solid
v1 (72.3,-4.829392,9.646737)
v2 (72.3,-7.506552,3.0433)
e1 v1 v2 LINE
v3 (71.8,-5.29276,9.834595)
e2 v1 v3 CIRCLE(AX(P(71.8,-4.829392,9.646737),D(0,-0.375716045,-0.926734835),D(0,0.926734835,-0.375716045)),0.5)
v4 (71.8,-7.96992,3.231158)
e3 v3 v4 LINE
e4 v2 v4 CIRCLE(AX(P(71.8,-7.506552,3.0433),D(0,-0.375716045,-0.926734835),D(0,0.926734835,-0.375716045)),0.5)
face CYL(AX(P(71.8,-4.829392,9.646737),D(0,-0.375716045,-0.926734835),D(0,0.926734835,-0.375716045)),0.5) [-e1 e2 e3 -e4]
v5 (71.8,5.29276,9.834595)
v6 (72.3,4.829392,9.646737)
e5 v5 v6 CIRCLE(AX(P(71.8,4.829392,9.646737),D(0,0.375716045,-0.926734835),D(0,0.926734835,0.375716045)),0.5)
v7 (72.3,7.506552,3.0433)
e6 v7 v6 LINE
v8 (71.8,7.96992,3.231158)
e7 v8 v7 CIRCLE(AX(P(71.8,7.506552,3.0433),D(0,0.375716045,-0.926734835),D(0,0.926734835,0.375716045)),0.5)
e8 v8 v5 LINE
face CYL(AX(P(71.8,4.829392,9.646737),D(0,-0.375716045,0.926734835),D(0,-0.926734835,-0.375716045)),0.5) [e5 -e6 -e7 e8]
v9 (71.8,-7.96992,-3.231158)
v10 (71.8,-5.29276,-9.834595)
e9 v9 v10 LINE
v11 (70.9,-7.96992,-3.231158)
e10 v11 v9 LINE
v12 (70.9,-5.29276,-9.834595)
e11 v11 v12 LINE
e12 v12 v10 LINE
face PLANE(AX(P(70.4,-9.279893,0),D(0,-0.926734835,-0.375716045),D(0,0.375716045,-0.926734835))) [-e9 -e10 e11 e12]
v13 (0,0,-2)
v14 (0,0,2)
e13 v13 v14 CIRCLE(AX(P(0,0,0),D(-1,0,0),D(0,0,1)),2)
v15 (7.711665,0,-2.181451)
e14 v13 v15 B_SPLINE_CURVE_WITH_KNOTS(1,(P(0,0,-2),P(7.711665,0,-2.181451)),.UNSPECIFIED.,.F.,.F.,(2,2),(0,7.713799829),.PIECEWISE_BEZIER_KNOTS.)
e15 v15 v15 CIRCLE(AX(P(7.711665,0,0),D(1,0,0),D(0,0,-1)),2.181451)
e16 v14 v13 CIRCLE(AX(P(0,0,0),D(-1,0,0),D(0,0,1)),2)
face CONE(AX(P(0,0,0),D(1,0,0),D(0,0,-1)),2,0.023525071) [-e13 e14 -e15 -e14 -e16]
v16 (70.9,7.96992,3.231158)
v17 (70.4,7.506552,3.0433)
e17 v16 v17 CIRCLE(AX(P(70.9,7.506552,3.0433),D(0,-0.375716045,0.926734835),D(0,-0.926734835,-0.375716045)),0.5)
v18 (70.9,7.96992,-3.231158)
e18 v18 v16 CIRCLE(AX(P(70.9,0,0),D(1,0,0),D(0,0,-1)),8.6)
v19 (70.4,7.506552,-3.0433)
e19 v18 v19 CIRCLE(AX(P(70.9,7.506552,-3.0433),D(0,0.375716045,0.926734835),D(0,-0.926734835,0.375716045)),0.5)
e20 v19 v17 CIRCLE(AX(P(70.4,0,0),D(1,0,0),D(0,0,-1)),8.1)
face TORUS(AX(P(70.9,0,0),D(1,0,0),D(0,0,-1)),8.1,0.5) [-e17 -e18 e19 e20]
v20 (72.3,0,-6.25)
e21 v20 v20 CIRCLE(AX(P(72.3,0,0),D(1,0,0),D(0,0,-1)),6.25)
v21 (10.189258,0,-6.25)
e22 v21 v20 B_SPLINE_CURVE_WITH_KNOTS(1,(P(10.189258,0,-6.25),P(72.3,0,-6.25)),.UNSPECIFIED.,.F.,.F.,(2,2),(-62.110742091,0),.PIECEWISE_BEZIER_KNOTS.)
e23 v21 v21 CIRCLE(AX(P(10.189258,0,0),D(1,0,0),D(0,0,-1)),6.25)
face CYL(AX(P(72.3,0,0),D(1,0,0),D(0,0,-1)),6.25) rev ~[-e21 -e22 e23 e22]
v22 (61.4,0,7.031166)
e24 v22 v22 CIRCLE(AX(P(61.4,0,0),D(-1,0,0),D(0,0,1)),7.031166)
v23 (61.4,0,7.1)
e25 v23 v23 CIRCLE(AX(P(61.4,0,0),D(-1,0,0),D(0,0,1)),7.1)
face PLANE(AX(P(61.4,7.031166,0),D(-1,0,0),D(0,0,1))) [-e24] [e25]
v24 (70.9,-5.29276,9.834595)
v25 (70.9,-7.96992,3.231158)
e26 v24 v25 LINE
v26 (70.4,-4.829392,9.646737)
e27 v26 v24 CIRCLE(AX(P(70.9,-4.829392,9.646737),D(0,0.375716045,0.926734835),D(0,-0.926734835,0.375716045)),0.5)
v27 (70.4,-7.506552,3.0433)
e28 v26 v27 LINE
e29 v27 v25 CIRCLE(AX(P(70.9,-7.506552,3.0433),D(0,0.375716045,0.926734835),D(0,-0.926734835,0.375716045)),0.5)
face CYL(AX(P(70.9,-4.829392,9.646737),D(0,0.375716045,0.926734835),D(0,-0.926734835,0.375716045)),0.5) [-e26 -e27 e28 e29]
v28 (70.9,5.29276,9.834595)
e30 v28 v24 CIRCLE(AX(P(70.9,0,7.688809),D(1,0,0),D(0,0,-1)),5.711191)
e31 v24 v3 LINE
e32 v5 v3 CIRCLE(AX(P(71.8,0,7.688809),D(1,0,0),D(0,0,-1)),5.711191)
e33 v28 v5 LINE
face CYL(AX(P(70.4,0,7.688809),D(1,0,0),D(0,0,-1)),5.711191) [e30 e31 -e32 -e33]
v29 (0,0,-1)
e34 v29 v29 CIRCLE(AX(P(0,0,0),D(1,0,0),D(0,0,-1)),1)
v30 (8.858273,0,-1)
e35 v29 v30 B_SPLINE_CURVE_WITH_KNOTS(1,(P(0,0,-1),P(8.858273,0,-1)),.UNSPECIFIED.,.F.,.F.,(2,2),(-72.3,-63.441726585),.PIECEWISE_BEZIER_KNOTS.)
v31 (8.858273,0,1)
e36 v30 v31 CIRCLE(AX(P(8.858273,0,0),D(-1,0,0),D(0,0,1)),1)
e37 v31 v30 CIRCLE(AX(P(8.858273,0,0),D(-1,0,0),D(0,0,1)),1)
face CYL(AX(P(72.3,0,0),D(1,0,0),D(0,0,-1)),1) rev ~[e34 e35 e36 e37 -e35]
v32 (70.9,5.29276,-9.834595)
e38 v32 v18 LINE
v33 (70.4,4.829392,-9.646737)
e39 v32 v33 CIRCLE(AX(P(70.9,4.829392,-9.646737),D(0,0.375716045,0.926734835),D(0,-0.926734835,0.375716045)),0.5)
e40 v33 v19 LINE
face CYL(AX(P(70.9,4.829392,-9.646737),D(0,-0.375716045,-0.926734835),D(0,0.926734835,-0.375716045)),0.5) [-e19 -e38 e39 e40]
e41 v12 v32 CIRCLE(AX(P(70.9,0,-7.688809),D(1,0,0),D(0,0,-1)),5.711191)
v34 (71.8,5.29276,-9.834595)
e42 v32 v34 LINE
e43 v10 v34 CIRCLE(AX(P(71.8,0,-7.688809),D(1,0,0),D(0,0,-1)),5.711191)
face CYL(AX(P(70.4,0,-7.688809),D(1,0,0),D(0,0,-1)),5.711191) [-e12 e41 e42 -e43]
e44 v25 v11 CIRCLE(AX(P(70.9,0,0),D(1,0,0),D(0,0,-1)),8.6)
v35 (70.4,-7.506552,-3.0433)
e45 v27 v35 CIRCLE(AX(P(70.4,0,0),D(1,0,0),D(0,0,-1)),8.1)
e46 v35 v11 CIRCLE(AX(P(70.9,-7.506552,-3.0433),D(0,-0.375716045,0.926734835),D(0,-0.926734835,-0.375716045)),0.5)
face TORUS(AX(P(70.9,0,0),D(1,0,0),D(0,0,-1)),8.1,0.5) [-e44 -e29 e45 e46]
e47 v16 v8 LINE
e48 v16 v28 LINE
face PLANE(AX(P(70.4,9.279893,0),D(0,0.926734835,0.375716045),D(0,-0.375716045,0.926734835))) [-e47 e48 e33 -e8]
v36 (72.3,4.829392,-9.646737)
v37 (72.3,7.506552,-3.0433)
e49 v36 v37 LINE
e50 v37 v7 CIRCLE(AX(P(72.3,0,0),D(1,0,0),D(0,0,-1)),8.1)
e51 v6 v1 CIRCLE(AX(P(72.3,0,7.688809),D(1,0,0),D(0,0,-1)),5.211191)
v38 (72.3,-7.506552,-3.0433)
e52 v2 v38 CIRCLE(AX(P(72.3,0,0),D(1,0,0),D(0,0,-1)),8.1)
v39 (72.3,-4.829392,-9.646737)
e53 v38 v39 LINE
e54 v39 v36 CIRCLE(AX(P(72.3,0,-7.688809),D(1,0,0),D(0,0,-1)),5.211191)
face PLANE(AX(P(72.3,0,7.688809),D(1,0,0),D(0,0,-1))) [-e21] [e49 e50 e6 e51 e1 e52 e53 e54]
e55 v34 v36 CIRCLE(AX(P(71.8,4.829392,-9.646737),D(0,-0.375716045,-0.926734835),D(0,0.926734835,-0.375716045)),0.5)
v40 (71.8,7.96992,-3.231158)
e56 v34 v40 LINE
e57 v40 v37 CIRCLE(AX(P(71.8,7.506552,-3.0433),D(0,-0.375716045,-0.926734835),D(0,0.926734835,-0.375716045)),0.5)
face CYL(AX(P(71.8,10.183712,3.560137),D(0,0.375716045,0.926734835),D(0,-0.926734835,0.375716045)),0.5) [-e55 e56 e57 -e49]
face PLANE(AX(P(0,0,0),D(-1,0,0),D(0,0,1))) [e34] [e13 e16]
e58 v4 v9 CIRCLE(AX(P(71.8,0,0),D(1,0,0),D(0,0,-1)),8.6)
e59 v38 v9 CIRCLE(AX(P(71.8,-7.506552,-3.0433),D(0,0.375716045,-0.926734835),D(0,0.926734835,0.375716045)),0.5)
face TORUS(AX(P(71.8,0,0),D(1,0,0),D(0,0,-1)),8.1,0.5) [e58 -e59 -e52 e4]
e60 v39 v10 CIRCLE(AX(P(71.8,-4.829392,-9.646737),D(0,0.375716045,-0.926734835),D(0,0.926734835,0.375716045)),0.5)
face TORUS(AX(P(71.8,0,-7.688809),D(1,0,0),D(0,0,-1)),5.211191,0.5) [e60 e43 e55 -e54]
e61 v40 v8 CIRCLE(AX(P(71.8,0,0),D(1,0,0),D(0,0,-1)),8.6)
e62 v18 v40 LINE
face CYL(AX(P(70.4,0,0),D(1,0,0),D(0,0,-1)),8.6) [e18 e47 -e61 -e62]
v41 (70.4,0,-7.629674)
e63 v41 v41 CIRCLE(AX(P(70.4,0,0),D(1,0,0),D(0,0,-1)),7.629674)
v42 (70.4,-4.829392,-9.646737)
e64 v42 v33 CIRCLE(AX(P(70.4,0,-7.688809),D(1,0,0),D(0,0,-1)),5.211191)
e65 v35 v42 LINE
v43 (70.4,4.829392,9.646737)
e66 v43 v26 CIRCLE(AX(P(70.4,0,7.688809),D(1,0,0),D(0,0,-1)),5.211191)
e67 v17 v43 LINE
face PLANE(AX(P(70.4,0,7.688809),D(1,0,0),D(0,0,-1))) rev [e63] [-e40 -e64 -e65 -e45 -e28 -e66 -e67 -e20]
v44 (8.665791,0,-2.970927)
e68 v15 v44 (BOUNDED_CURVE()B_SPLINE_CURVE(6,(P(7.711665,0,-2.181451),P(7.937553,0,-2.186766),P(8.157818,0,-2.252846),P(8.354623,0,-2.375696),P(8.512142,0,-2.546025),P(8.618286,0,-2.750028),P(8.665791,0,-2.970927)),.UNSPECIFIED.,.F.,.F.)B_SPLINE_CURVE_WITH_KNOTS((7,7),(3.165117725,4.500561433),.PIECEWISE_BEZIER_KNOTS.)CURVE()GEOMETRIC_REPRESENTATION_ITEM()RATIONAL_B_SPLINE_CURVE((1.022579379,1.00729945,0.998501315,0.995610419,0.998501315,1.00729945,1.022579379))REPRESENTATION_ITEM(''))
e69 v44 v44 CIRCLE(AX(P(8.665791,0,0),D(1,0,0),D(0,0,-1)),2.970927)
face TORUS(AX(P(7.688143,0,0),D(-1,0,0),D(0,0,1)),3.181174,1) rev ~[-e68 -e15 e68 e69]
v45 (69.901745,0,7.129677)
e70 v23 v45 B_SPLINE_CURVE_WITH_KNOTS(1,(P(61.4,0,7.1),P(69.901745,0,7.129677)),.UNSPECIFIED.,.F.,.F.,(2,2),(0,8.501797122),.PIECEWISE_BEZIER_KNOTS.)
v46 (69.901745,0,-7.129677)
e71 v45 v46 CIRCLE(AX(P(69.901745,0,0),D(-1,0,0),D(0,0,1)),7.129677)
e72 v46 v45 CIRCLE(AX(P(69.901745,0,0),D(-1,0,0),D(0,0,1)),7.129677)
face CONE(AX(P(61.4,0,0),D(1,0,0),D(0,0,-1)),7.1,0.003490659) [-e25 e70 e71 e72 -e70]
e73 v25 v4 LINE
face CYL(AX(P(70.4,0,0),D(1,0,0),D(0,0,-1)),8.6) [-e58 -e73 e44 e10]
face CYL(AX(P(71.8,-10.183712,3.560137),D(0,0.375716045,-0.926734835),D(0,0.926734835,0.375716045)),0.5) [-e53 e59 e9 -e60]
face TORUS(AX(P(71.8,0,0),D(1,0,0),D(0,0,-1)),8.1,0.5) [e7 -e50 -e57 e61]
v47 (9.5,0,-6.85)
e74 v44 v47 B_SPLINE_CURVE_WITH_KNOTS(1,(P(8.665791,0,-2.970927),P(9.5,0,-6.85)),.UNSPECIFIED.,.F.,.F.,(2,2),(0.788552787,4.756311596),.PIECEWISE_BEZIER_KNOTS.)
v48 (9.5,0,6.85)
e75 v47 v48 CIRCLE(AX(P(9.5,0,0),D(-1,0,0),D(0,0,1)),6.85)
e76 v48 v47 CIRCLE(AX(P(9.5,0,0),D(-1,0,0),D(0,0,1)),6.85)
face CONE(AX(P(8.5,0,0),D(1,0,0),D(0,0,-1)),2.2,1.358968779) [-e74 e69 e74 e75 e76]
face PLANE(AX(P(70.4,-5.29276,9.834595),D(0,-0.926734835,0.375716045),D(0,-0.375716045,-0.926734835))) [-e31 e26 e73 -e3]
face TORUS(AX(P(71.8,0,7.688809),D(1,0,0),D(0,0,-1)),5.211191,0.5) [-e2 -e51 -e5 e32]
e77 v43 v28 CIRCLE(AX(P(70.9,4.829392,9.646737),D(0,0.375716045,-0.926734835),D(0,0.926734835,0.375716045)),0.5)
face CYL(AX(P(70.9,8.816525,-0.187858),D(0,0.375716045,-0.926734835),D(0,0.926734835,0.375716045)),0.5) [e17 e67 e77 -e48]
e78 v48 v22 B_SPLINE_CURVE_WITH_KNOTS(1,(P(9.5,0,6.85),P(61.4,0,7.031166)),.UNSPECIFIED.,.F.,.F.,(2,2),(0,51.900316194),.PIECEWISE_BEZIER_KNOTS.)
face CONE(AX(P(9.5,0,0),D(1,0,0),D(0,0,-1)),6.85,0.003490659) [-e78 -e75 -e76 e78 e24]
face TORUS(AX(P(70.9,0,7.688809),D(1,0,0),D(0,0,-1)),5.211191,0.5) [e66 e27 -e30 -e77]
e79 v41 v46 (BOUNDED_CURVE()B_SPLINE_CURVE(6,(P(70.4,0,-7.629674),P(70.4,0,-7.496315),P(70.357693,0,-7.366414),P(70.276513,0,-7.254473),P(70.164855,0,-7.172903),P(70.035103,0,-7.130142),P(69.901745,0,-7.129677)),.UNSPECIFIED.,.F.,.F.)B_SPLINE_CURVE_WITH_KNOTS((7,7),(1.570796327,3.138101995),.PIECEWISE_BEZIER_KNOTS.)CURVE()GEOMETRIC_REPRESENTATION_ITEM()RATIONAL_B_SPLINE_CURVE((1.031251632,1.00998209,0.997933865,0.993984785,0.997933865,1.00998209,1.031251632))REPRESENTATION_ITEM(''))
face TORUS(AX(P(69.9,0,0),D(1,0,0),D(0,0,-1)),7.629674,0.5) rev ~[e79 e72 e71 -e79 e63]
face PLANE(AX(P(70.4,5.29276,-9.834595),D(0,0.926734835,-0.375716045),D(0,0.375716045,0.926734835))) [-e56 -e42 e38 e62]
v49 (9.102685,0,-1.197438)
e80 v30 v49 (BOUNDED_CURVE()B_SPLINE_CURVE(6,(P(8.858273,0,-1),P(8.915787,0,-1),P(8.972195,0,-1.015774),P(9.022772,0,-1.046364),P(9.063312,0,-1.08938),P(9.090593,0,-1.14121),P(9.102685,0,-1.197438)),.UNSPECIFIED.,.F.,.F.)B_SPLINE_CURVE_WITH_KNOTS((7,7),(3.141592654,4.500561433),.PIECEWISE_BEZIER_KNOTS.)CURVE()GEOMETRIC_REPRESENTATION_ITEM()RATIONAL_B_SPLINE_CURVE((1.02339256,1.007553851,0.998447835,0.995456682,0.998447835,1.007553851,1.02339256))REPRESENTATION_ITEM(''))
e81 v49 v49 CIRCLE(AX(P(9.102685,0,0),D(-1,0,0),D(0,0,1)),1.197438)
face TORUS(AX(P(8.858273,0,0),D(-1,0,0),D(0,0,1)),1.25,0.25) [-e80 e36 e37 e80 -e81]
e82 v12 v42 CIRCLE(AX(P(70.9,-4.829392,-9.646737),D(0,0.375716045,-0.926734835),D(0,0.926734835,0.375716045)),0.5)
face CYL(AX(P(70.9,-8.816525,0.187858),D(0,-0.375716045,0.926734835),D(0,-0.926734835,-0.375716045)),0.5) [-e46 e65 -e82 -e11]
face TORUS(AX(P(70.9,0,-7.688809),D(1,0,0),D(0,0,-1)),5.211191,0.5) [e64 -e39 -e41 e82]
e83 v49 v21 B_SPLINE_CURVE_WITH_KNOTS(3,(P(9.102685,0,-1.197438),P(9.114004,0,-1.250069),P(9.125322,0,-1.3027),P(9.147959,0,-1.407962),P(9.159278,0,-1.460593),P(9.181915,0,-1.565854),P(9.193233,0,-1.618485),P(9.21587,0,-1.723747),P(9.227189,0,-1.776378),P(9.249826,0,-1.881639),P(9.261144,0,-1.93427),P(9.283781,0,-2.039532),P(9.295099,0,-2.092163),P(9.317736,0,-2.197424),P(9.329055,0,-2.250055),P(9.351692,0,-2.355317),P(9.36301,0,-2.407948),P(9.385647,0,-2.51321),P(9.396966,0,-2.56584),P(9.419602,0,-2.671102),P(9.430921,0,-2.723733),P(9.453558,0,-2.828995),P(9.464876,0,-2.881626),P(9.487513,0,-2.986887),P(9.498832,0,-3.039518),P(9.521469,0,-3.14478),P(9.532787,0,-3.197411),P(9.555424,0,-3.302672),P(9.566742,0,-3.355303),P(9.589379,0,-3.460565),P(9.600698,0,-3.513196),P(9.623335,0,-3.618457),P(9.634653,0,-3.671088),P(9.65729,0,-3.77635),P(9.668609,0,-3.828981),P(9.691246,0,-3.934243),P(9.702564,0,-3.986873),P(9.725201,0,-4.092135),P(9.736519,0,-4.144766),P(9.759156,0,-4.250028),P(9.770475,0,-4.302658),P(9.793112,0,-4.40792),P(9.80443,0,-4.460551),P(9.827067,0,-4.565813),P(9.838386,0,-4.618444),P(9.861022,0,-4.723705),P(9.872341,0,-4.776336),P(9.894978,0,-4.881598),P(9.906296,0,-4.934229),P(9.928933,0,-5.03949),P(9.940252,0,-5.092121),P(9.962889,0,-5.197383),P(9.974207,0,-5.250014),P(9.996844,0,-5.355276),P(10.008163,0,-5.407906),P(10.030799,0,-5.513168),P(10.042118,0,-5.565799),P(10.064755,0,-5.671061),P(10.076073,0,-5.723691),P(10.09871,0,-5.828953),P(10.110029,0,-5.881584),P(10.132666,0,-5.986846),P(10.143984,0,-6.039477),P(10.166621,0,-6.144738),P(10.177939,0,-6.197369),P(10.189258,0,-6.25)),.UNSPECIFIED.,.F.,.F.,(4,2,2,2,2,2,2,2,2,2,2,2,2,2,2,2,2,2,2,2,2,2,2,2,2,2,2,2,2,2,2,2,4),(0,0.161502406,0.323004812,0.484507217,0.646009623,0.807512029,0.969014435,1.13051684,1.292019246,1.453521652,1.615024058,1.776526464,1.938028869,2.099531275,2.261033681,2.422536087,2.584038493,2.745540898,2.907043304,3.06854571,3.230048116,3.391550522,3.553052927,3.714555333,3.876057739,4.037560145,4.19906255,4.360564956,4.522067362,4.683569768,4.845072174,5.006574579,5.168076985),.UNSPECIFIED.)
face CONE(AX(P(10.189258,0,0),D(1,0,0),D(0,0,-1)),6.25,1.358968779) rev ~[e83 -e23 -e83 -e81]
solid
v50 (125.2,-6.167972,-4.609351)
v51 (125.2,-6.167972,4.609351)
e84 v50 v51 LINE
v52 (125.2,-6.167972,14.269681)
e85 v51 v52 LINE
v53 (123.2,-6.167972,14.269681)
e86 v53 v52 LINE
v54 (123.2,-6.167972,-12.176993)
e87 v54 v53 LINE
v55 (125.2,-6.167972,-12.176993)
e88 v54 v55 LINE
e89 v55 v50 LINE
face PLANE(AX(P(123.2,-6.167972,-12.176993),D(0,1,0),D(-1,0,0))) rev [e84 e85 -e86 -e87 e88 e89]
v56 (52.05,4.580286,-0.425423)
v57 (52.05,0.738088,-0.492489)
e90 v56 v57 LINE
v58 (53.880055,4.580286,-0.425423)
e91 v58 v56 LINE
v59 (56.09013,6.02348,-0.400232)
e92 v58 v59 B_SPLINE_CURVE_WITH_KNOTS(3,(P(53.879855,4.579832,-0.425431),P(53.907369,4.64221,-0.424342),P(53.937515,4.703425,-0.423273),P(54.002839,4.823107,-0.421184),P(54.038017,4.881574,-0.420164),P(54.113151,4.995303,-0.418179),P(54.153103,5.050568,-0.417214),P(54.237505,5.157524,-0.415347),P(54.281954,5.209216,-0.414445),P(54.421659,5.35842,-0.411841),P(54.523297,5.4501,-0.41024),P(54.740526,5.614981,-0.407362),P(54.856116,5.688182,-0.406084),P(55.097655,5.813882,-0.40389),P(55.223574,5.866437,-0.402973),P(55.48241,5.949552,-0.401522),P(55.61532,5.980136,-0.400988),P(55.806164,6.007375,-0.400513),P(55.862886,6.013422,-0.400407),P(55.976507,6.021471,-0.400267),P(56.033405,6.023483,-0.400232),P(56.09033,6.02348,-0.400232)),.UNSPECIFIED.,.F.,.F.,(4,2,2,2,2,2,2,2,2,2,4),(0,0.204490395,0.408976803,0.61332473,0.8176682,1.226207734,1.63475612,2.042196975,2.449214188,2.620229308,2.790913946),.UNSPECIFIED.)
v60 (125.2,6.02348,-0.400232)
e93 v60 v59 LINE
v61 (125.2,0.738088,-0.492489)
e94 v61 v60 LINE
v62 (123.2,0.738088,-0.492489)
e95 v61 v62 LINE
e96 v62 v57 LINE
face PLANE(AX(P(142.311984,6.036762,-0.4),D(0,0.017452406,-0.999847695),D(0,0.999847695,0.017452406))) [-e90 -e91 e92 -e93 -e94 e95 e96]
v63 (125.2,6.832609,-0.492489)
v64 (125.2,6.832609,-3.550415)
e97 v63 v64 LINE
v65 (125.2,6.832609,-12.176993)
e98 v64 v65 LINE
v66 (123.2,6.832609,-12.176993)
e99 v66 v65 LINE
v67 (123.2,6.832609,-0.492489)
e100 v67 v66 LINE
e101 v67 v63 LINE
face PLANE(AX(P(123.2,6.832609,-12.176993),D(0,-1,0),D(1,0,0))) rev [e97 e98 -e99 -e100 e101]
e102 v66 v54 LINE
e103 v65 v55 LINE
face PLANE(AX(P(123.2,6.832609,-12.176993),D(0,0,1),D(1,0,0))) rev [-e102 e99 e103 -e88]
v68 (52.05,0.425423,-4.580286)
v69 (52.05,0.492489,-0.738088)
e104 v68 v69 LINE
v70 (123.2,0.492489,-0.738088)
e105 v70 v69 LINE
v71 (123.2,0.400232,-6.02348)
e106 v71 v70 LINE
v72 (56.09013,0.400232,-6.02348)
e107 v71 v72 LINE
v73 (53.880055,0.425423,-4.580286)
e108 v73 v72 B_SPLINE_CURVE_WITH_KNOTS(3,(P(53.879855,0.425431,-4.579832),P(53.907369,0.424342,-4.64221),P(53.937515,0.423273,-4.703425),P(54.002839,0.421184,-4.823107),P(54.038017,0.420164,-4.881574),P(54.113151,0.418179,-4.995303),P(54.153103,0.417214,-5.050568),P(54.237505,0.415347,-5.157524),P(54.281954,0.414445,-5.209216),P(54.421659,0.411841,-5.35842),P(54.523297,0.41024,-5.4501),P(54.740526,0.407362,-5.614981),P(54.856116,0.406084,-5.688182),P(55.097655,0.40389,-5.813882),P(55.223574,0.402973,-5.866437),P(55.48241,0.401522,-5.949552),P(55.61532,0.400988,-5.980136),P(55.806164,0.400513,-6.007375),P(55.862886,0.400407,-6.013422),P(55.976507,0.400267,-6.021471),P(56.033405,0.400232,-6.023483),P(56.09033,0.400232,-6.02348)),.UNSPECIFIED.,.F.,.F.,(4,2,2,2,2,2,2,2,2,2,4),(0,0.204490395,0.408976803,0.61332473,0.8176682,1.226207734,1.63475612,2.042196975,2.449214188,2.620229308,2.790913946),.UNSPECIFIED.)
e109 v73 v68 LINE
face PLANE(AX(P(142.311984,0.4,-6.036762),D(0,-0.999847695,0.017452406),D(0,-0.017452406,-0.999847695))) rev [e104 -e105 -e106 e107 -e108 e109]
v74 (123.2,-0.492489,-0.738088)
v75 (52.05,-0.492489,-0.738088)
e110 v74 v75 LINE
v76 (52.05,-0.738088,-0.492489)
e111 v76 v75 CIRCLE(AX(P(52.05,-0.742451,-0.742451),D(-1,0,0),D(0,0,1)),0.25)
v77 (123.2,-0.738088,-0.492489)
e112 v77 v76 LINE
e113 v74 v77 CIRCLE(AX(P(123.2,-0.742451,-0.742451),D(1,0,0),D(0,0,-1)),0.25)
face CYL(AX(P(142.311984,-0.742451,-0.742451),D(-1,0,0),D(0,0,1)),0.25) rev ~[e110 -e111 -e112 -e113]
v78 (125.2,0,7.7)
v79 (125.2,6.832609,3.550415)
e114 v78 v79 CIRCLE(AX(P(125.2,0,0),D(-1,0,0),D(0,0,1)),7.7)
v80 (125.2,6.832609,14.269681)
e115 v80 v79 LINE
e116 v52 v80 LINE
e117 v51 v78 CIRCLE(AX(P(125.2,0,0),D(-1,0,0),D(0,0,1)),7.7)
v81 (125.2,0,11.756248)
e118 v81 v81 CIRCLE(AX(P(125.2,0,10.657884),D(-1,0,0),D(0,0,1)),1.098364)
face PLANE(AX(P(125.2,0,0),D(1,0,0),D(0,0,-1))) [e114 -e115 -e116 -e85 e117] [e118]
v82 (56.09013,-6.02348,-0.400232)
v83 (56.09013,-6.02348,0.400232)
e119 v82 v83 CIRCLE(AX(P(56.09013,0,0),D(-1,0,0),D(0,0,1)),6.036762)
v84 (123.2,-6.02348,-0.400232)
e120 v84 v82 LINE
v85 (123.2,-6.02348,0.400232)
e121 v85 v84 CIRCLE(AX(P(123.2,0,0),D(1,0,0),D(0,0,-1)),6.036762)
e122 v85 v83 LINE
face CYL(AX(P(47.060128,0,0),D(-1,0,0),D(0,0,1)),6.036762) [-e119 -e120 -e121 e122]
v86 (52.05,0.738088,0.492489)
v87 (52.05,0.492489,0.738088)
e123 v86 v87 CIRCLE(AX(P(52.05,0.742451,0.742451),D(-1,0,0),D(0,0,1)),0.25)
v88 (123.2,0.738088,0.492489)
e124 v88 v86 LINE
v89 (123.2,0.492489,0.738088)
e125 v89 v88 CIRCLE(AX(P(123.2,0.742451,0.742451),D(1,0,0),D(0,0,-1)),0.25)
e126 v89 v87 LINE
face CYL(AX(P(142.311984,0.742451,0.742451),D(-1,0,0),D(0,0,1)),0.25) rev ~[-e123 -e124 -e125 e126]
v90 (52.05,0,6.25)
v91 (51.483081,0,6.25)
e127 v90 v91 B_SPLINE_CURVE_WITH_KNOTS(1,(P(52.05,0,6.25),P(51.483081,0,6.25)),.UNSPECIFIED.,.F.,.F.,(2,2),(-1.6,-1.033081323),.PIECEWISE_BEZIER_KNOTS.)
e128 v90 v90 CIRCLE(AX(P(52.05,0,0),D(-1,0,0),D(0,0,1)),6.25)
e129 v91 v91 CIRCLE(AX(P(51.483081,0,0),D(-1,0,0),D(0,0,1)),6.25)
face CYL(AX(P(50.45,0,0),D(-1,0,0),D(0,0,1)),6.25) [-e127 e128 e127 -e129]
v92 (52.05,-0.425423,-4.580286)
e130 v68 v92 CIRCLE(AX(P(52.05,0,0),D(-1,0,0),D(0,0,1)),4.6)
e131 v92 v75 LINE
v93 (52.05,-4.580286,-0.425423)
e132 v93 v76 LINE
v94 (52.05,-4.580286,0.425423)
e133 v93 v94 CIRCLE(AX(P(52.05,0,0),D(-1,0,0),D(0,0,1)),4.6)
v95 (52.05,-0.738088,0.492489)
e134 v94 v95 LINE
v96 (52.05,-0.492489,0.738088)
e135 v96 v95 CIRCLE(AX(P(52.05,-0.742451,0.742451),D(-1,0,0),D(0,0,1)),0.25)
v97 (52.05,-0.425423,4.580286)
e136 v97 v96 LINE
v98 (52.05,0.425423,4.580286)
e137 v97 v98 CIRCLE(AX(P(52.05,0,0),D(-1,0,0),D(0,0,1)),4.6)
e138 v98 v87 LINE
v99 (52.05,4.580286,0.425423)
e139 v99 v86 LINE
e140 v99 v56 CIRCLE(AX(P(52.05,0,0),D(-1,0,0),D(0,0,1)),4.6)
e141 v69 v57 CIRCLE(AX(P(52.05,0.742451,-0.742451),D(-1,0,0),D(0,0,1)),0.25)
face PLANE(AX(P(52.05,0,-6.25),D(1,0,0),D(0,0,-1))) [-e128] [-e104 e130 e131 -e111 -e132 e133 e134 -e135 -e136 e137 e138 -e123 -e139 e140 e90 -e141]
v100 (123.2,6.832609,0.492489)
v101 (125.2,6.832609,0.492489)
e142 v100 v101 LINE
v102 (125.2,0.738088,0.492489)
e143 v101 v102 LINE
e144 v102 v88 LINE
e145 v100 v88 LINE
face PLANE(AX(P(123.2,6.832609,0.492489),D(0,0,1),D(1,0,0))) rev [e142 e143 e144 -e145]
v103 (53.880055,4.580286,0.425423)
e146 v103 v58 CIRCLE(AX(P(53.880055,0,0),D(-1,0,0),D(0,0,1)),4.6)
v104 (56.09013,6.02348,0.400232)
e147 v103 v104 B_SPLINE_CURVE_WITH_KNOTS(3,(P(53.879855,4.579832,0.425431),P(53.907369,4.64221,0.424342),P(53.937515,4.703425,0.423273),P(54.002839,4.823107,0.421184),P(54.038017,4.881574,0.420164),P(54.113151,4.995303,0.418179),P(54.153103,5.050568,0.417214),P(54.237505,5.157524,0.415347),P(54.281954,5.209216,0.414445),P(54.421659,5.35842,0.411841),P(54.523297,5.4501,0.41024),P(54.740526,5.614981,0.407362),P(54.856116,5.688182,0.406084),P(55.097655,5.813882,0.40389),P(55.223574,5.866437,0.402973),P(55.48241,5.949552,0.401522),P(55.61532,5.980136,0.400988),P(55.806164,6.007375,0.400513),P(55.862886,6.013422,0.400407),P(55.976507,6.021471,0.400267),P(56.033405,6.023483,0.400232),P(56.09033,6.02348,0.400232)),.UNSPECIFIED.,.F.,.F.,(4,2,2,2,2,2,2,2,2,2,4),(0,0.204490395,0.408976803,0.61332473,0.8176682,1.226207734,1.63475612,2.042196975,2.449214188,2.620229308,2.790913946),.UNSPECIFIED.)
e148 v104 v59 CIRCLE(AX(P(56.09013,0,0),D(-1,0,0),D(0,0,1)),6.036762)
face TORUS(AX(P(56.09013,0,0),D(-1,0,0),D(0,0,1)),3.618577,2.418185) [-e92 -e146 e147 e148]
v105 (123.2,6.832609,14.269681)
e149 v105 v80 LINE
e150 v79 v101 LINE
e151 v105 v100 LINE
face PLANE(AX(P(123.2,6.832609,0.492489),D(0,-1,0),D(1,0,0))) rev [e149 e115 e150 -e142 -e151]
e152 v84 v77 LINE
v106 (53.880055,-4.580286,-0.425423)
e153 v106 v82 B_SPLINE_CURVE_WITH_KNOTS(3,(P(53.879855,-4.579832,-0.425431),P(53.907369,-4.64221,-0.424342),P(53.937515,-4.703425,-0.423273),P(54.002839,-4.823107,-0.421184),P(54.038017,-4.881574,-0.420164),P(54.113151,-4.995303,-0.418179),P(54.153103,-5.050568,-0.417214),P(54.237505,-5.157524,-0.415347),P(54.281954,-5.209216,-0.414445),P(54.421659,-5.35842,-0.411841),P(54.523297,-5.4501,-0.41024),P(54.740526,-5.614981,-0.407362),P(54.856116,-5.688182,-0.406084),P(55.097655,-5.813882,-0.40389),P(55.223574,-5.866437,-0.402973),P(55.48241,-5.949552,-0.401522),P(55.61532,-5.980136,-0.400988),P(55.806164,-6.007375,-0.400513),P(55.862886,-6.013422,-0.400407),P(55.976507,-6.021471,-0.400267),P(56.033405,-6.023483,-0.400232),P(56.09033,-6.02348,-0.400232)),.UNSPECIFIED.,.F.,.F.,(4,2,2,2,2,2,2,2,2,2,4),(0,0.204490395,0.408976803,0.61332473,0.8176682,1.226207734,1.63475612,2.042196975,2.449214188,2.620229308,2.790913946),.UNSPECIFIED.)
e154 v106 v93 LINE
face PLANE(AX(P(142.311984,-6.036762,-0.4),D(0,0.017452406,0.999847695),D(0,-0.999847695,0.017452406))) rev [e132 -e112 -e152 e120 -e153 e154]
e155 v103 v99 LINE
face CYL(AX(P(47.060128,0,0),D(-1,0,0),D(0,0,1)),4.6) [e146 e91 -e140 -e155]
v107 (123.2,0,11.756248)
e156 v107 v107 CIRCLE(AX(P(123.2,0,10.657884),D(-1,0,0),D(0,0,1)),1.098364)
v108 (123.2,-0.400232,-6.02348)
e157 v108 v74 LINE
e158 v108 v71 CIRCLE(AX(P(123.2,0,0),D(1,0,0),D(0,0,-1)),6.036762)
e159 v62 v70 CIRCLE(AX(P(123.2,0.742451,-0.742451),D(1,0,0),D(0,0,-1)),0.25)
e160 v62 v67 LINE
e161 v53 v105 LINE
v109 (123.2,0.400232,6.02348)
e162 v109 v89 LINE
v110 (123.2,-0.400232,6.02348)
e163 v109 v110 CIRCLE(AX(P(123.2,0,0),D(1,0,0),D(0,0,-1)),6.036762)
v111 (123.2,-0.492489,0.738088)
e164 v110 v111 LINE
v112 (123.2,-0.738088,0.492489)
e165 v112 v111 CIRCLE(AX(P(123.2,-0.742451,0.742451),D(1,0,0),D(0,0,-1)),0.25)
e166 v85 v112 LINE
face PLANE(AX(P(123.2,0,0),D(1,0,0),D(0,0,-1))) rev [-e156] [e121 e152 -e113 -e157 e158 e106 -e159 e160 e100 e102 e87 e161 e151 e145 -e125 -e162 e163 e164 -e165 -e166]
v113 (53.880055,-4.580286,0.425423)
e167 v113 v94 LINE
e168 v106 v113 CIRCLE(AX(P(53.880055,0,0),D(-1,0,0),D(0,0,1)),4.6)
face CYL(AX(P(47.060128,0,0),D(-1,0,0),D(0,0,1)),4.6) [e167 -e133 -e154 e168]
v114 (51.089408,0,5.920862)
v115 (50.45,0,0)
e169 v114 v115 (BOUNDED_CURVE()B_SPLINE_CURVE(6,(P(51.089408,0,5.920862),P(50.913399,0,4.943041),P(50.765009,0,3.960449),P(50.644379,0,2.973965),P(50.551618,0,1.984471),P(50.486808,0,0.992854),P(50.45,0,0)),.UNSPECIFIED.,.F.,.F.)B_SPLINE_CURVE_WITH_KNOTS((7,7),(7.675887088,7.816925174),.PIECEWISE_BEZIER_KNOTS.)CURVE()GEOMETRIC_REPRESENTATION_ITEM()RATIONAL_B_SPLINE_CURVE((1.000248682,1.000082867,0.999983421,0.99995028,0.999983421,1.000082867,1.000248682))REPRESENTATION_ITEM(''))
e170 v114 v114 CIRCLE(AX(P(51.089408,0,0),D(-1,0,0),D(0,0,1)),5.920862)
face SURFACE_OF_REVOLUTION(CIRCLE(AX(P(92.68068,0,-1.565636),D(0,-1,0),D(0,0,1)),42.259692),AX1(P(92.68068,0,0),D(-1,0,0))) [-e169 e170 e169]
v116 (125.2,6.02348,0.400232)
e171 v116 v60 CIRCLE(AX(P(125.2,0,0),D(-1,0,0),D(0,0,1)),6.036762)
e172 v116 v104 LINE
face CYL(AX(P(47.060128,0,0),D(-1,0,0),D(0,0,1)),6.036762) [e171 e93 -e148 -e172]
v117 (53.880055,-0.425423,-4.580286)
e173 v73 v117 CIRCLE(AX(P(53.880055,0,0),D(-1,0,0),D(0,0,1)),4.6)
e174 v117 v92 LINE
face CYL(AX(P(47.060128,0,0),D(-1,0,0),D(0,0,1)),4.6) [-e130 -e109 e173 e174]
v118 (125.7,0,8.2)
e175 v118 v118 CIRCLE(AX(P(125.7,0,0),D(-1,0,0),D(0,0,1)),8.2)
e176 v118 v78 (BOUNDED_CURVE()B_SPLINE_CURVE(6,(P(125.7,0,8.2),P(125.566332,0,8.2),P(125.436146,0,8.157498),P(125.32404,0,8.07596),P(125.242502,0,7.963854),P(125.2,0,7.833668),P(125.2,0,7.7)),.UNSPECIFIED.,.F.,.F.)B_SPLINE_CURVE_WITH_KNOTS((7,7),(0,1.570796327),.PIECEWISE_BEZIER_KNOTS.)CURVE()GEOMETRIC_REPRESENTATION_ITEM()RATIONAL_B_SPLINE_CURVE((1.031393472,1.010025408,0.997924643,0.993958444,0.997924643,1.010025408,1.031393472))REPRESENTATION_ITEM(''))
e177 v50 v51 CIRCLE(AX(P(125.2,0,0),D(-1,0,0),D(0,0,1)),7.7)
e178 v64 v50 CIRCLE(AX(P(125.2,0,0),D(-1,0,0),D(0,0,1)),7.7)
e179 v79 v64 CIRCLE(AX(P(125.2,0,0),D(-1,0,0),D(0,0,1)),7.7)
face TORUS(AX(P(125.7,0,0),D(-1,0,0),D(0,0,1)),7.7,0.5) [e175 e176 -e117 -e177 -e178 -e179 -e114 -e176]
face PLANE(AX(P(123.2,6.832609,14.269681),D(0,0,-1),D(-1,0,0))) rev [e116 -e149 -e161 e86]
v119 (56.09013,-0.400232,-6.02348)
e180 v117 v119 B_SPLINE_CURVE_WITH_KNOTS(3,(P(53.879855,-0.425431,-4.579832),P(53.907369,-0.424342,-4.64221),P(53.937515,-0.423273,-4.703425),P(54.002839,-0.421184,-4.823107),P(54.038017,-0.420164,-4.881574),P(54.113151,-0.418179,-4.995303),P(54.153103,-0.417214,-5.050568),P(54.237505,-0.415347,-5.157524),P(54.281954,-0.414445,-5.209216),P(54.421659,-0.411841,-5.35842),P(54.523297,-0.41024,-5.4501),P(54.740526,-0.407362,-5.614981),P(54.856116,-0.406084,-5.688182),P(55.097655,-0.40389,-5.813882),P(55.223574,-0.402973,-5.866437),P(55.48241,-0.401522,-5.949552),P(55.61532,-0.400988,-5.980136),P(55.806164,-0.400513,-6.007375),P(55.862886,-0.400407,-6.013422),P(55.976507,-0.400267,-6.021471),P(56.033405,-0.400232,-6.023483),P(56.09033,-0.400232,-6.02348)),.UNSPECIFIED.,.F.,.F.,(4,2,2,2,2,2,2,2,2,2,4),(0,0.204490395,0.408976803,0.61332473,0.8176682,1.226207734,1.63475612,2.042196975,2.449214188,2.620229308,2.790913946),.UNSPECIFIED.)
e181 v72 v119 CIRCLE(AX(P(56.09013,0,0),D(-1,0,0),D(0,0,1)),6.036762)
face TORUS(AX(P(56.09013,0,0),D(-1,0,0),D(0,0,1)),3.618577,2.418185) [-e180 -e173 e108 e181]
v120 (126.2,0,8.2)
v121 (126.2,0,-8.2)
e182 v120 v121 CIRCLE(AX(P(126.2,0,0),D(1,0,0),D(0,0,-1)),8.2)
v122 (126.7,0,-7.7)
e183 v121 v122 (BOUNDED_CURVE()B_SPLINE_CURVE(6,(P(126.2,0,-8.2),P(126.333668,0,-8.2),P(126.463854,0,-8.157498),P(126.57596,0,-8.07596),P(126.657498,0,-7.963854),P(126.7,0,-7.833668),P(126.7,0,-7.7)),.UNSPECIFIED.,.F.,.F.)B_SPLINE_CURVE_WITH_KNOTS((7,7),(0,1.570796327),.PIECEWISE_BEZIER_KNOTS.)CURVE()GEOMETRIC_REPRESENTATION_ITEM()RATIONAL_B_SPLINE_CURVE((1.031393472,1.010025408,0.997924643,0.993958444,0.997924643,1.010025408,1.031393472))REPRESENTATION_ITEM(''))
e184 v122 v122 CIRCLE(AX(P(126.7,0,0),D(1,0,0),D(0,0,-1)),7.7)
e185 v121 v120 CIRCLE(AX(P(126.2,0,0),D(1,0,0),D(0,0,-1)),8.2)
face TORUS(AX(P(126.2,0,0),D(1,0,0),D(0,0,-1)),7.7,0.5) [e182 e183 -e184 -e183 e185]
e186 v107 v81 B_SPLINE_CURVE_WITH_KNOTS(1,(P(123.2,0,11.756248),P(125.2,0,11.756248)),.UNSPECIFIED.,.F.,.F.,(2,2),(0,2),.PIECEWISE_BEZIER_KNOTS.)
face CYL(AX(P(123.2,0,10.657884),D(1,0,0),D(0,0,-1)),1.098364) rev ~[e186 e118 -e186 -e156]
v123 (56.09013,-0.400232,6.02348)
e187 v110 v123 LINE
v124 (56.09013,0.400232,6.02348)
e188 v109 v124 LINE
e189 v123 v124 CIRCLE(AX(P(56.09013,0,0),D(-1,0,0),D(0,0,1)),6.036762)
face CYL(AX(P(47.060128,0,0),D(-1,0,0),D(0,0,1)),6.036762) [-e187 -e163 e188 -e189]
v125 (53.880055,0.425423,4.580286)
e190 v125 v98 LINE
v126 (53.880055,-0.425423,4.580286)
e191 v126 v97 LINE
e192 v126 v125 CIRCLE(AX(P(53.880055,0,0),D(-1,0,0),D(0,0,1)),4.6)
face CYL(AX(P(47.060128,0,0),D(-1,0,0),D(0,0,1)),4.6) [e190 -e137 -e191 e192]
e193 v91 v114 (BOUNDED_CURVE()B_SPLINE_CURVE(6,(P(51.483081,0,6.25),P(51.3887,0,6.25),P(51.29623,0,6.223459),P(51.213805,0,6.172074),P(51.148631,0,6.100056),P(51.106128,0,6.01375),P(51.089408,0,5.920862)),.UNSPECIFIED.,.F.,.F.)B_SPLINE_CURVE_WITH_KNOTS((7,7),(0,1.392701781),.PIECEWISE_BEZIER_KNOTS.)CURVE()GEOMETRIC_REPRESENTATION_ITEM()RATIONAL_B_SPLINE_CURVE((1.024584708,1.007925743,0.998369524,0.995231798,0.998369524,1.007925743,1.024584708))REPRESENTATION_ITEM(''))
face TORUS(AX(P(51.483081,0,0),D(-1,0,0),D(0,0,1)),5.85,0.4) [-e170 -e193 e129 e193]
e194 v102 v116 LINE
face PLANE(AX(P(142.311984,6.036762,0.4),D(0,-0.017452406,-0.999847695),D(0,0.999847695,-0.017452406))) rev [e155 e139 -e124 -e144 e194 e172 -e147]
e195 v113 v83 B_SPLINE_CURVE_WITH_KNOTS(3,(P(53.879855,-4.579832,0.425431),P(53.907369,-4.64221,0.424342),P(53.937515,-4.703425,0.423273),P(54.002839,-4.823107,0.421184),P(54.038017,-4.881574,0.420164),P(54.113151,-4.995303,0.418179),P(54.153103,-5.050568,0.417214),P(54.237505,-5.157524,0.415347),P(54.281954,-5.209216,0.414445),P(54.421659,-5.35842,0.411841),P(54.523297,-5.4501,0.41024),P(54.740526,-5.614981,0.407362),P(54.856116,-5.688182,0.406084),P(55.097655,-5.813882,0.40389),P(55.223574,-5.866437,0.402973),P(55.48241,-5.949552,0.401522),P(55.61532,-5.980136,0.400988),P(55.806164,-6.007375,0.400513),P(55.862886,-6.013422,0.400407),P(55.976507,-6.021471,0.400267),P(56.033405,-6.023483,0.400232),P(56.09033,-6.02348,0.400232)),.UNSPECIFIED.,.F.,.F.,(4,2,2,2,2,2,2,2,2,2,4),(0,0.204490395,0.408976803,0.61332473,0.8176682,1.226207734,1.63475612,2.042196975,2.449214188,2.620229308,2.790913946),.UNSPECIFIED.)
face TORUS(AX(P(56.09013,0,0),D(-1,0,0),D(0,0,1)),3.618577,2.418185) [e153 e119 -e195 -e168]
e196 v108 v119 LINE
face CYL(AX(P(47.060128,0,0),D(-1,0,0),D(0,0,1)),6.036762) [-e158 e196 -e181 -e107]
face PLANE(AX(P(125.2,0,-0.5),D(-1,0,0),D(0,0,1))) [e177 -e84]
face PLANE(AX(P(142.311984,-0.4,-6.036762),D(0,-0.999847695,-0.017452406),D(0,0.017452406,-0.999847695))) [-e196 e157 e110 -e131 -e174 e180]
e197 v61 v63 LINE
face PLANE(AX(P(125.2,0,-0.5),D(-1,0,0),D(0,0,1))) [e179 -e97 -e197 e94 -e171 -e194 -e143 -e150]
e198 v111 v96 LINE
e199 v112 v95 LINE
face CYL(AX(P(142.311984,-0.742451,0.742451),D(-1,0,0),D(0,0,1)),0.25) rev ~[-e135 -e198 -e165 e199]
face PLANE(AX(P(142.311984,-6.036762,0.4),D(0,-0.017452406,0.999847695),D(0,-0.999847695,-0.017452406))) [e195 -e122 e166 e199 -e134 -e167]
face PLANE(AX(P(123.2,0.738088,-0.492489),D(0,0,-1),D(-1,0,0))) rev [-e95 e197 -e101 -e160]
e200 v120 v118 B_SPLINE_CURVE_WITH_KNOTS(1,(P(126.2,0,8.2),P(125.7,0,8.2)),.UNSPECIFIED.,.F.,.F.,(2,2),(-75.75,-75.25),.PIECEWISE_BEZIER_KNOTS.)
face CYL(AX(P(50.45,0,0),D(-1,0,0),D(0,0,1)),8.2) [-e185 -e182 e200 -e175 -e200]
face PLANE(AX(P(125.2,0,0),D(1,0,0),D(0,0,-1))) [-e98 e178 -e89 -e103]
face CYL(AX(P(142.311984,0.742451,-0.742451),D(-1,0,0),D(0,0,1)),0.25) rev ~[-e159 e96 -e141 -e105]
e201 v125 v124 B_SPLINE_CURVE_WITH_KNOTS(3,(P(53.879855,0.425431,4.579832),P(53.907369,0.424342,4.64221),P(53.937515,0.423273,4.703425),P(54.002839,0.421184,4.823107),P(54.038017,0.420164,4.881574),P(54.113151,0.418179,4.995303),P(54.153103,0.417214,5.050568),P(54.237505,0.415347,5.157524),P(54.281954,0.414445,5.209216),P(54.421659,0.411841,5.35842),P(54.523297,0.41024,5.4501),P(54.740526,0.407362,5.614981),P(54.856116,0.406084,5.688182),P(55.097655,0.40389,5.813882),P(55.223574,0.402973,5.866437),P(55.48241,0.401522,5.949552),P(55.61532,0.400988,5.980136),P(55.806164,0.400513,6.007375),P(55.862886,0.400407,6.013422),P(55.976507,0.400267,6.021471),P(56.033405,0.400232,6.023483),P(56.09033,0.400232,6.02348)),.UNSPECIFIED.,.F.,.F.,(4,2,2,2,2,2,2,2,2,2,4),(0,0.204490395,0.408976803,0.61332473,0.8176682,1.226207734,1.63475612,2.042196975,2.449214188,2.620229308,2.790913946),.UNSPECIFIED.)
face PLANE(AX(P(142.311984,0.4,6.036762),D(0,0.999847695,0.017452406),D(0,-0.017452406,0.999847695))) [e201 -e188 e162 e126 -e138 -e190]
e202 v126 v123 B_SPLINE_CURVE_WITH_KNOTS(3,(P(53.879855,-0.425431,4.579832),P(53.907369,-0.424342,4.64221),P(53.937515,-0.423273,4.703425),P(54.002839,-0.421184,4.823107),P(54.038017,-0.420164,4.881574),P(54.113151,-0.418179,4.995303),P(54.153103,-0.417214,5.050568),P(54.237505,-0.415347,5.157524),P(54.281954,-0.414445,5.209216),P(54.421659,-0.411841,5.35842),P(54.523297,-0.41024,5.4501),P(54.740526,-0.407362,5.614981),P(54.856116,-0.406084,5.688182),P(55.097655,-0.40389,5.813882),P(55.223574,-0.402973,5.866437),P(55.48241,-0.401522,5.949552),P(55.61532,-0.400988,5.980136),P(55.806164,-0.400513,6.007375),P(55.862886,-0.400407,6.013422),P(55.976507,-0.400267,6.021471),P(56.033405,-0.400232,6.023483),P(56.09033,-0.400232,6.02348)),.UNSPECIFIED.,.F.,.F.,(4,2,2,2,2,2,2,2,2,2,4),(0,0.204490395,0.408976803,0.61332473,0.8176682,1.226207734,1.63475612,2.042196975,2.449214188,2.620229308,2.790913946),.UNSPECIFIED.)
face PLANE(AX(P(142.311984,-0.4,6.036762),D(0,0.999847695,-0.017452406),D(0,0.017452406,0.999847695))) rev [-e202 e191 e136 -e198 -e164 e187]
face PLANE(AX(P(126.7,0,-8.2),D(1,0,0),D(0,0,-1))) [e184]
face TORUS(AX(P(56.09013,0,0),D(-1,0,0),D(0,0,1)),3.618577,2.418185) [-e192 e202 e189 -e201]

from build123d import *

# Parameters (mm, degrees)
BOSS_EXTRUDE1_DEPTH       = 1.9
FILLET1_R                 = 8.6
FILLET2_R                 = 0.25
FILLET3_R                 = 0.5
FILLET4_R                 = 1
BOSS_EXTRUDE2_START       = 53.880055185
BOSS_EXTRUDE2_2_DEPTH     = 71.319944815
BOSS_EXTRUDE2_START_2     = 123.2
BOSS_EXTRUDE2_3_OUTLINE_R = 1.098363789
BOSS_EXTRUDE2_3_DEPTH     = 2
BOSS_EXTRUDE2_START_3     = 52.05
BOSS_EXTRUDE2_4_DEPTH     = 4.040129852


with BuildPart() as part:
    # Sketch1 → Boss-Extrude1 (new body)
    with BuildSketch(Plane(origin=(72.3, 0, 0), x_dir=(0, 0, -1), z_dir=(1, 0, 0))):
        with BuildLine():
            Line((-9.834595004, -5.292759782), (0, -9.279892888))
            Line((0, -9.279892888), (9.834595004, -5.292759782))
            ThreePointArc((9.834595004, -5.292759782), (13.4, 0), (9.834595004, 5.292759782))
            Line((9.834595004, 5.292759782), (0, 9.279892888))
            Line((0, 9.279892888), (-9.834595004, 5.292759782))
            ThreePointArc((-9.834595004, 5.292759782), (-13.4, 0), (-9.834595004, -5.292759782))
        make_face()
    extrude(amount=-BOSS_EXTRUDE1_DEPTH)

    # Sketch2 → Revolve1 (revolve)
    with BuildSketch(Plane(origin=(0, 0, 0), x_dir=(-1, 0, 0), z_dir=(0, 0, -1)), mode=Mode.PRIVATE) as revolve1_sk:
        Polygon((-70.4, 7.131416054), (-70.4, 0), (0, 0), (0, 2), (-8.5, 2.2), (-9.5, 6.85), (-61.4, 7.031165912), (-61.4, 7.1), align=None)
    revolve(revolve1_sk.sketch.rotate(Axis((70.4, 0, 0), (-1, 0, 0)), 90), axis=Axis((70.4, 0, 0), (-1, 0, 0)))

    # Sketch3 → Hole1 (revolve, cut)
    with BuildSketch(Plane(origin=(72.3, 0, 0), x_dir=(0, 0, -1), z_dir=(0, 1, 0))):
        Polygon((0, 0), (0, 72.3), (1, 72.3), (1, 63.239774349), (6.25, 62.110742091), (6.25, 0), align=None)
    revolve(axis=Axis((78.430023899, 0, 0), (-1, 0, 0)), mode=Mode.SUBTRACT)

    # Fillet1
    fillet1_edges = [part.edges().sort_by_distance(p)[0] for p in [
        (71.35, 9.279892888, 0),
        (71.35, -9.279892888, 0),
    ]]
    fillet(fillet1_edges, radius=FILLET1_R)

    # Fillet2
    fillet2_edges = [part.edges().sort_by_distance(p)[0] for p in [
        (9.060225651, 0, 1),
    ]]
    fillet(fillet2_edges, radius=FILLET2_R)

    # Fillet3
    fillet3_edges = [part.edges().sort_by_distance(p)[0] for p in [
        (70.4, 0, -13.4),
        (70.4, 0, 7.131416054),
        (70.4, 6.631339679, -6.532876496),
        (72.3, -6.631339679, -6.532876496),
        (72.3, 6.631339679, 6.532876496),
        (72.3, 8.6, 0),
        (72.3, -8.6, 0),
        (70.4, -6.631339679, -6.532876496),
        (70.4, 6.631339679, 6.532876496),
        (70.4, 8.6, 0),
        (70.4, -8.6, 0),
        (70.4, 0, 13.4),
        (72.3, 6.631339679, -6.532876496),
        (72.3, 0, -13.4),
        (72.3, -6.631339679, 6.532876496),
        (72.3, 0, 13.4),
        (70.4, -6.631339679, 6.532876496),
    ]]
    fillet(fillet3_edges, radius=FILLET3_R)

    # Fillet4
    fillet4_edges = [part.edges().sort_by_distance(p)[0] for p in [
        (8.5, 0, 2.2),
    ]]
    fillet(fillet4_edges, radius=FILLET4_R)


with BuildPart() as body_2:
    # Boss-Extrude2: read off the stored shape, not the designer's step
    # Boss-Extrude2 outline → Boss-Extrude2 (revolve)
    with BuildSketch(Plane.YX):
        with BuildLine():
            ThreePointArc((7.7, 125.2), (8.053553391, 125.346446609), (8.2, 125.7))
            Line((8.2, 125.7), (8.2, 126.2))
            ThreePointArc((8.2, 126.2), (8.053553391, 126.553553391), (7.7, 126.7))
            Line((7.7, 126.7), (0, 126.7))
            Line((0, 126.7), (0, 125.2))
            Line((0, 125.2), (7.7, 125.2))
        make_face()
        with BuildLine():
            ThreePointArc((5.920861832, 51.089408107), (6.156875164, 51.226512359), (6.25, 51.483081323))
            Line((6.25, 51.483081323), (6.25, 52.05))
            Line((6.25, 52.05), (0, 52.05))
            Line((0, 52.05), (0, 50.45))
            add(Edge.make_bspline(
                [(5.920861832, 51.089408107), (2.983013586, 50.560590548), (0, 50.45)],
                knots=[1.392701781, 1.392701781, 1.392701781, 1.533739867, 1.533739867, 1.533739867], degree=2, weights=[1, 0.997514563, 1]))
        make_face()
    revolve(axis=Axis((0, 0, 0), (1, 0, 0)))

    # Boss-Extrude2 2 outline → Boss-Extrude2 2 (add)
    with BuildSketch(Plane.YZ.offset(BOSS_EXTRUDE2_START)):
        with BuildLine():
            ThreePointArc((-0.738087536, -0.492488713), (-0.565673942, -0.565673942), (-0.492488713, -0.738087536))
            Line((-0.492488713, -0.738087536), (-0.40023184, -6.023480263))
            ThreePointArc((-0.40023184, -6.023480263), (0, -6.036762377), (0.40023184, -6.023480263))
            Line((0.40023184, -6.023480263), (0.492488713, -0.738087536))
            ThreePointArc((0.492488713, -0.738087536), (0.565673942, -0.565673942), (0.738087536, -0.492488713))
            Line((0.738087536, -0.492488713), (6.023480263, -0.40023184))
            ThreePointArc((6.023480263, -0.40023184), (6.036762377, 0), (6.023480263, 0.40023184))
            Line((6.023480263, 0.40023184), (0.738087536, 0.492488713))
            ThreePointArc((0.738087536, 0.492488713), (0.565673942, 0.565673942), (0.492488713, 0.738087536))
            Line((0.492488713, 0.738087536), (0.40023184, 6.023480263))
            ThreePointArc((0.40023184, 6.023480263), (0, 6.036762377), (-0.40023184, 6.023480263))
            Line((-0.40023184, 6.023480263), (-0.492488713, 0.738087536))
            ThreePointArc((-0.492488713, 0.738087536), (-0.565673942, 0.565673942), (-0.738087536, 0.492488713))
            Line((-0.738087536, 0.492488713), (-6.023480263, 0.40023184))
            ThreePointArc((-6.023480263, 0.40023184), (-6.036762377, 0), (-6.023480263, -0.40023184))
            Line((-6.023480263, -0.40023184), (-0.738087536, -0.492488713))
        make_face()
    extrude(amount=BOSS_EXTRUDE2_2_DEPTH)

    # Boss-Extrude2 3 outline → Boss-Extrude2 3 (add)
    with BuildSketch(Plane.YZ.offset(BOSS_EXTRUDE2_START_2)):
        with BuildLine():
            ThreePointArc((-0.492488713, -0.738087536), (-0.565673942, -0.565673942), (-0.738087536, -0.492488713))
            Line((-0.738087536, -0.492488713), (-6.023480263, -0.40023184))
            ThreePointArc((-6.023480263, -0.40023184), (-6.036762377, 0), (-6.023480263, 0.40023184))
            Line((-6.023480263, 0.40023184), (-0.738087536, 0.492488713))
            ThreePointArc((-0.738087536, 0.492488713), (-0.565673942, 0.565673942), (-0.492488713, 0.738087536))
            Line((-0.492488713, 0.738087536), (-0.40023184, 6.023480263))
            ThreePointArc((-0.40023184, 6.023480263), (0, 6.036762377), (0.40023184, 6.023480263))
            Line((0.40023184, 6.023480263), (0.492488713, 0.738087536))
            ThreePointArc((0.492488713, 0.738087536), (0.565673942, 0.565673942), (0.738087536, 0.492488713))
            Line((0.738087536, 0.492488713), (6.832609378, 0.492488713))
            Line((6.832609378, 0.492488713), (6.832609378, 14.269681487))
            Line((6.832609378, 14.269681487), (-6.167972262, 14.269681487))
            Line((-6.167972262, 14.269681487), (-6.167972262, -12.176993067))
            Line((-6.167972262, -12.176993067), (6.832609378, -12.176993067))
            Line((6.832609378, -12.176993067), (6.832609378, -0.492488713))
            Line((6.832609378, -0.492488713), (0.738087536, -0.492488713))
            ThreePointArc((0.738087536, -0.492488713), (0.565673942, -0.565673942), (0.492488713, -0.738087536))
            Line((0.492488713, -0.738087536), (0.40023184, -6.023480263))
            ThreePointArc((0.40023184, -6.023480263), (0, -6.036762377), (-0.40023184, -6.023480263))
            Line((-0.40023184, -6.023480263), (-0.492488713, -0.738087536))
        make_face()
        with Locations((0, 10.65788427)):
            Circle(BOSS_EXTRUDE2_3_OUTLINE_R, mode=Mode.SUBTRACT)
    extrude(amount=BOSS_EXTRUDE2_3_DEPTH)

    # Boss-Extrude2 4 outline → Boss-Extrude2 4 (add)
    with BuildSketch(Plane.YZ.offset(BOSS_EXTRUDE2_START_3)):
        with BuildLine():
            Line((-4.58028551, -0.425422898), (-0.738087536, -0.492488713))
            ThreePointArc((-0.738087536, -0.492488713), (-0.565673942, -0.565673942), (-0.492488713, -0.738087536))
            Line((-0.492488713, -0.738087536), (-0.425422898, -4.58028551))
            ThreePointArc((-0.425422898, -4.58028551), (0, -4.6), (0.425422898, -4.58028551))
            Line((0.425422898, -4.58028551), (0.492488713, -0.738087536))
            ThreePointArc((0.492488713, -0.738087536), (0.565673942, -0.565673942), (0.738087536, -0.492488713))
            Line((0.738087536, -0.492488713), (4.58028551, -0.425422898))
            ThreePointArc((4.58028551, -0.425422898), (4.6, 0), (4.58028551, 0.425422898))
            Line((4.58028551, 0.425422898), (0.738087536, 0.492488713))
            ThreePointArc((0.738087536, 0.492488713), (0.565673942, 0.565673942), (0.492488713, 0.738087536))
            Line((0.492488713, 0.738087536), (0.425422898, 4.58028551))
            ThreePointArc((0.425422898, 4.58028551), (0, 4.6), (-0.425422898, 4.58028551))
            Line((-0.425422898, 4.58028551), (-0.492488713, 0.738087536))
            ThreePointArc((-0.492488713, 0.738087536), (-0.565673942, 0.565673942), (-0.738087536, 0.492488713))
            Line((-0.738087536, 0.492488713), (-4.58028551, 0.425422898))
            ThreePointArc((-4.58028551, 0.425422898), (-4.6, 0), (-4.58028551, -0.425422898))
        make_face()
    extrude(amount=BOSS_EXTRUDE2_4_DEPTH)

    # Boss-Extrude2 5 outline → Boss-Extrude2 5 (revolve, cut)
    with BuildSketch(Plane.YX):
        with BuildLine():
            Line((6.036762378, 53.880055185), (6.036762377, 56.090129852))
            ThreePointArc((6.036762377, 56.090129852), (5.645999412, 54.772109014), (4.6, 53.880055286))
            Line((4.6, 53.880055286), (6.036762378, 53.880055185))
        make_face()
    revolve(axis=Axis((0, 0, 0), (1, 0, 0)), mode=Mode.SUBTRACT)


solid = Compound([part.part, body_2.part])
